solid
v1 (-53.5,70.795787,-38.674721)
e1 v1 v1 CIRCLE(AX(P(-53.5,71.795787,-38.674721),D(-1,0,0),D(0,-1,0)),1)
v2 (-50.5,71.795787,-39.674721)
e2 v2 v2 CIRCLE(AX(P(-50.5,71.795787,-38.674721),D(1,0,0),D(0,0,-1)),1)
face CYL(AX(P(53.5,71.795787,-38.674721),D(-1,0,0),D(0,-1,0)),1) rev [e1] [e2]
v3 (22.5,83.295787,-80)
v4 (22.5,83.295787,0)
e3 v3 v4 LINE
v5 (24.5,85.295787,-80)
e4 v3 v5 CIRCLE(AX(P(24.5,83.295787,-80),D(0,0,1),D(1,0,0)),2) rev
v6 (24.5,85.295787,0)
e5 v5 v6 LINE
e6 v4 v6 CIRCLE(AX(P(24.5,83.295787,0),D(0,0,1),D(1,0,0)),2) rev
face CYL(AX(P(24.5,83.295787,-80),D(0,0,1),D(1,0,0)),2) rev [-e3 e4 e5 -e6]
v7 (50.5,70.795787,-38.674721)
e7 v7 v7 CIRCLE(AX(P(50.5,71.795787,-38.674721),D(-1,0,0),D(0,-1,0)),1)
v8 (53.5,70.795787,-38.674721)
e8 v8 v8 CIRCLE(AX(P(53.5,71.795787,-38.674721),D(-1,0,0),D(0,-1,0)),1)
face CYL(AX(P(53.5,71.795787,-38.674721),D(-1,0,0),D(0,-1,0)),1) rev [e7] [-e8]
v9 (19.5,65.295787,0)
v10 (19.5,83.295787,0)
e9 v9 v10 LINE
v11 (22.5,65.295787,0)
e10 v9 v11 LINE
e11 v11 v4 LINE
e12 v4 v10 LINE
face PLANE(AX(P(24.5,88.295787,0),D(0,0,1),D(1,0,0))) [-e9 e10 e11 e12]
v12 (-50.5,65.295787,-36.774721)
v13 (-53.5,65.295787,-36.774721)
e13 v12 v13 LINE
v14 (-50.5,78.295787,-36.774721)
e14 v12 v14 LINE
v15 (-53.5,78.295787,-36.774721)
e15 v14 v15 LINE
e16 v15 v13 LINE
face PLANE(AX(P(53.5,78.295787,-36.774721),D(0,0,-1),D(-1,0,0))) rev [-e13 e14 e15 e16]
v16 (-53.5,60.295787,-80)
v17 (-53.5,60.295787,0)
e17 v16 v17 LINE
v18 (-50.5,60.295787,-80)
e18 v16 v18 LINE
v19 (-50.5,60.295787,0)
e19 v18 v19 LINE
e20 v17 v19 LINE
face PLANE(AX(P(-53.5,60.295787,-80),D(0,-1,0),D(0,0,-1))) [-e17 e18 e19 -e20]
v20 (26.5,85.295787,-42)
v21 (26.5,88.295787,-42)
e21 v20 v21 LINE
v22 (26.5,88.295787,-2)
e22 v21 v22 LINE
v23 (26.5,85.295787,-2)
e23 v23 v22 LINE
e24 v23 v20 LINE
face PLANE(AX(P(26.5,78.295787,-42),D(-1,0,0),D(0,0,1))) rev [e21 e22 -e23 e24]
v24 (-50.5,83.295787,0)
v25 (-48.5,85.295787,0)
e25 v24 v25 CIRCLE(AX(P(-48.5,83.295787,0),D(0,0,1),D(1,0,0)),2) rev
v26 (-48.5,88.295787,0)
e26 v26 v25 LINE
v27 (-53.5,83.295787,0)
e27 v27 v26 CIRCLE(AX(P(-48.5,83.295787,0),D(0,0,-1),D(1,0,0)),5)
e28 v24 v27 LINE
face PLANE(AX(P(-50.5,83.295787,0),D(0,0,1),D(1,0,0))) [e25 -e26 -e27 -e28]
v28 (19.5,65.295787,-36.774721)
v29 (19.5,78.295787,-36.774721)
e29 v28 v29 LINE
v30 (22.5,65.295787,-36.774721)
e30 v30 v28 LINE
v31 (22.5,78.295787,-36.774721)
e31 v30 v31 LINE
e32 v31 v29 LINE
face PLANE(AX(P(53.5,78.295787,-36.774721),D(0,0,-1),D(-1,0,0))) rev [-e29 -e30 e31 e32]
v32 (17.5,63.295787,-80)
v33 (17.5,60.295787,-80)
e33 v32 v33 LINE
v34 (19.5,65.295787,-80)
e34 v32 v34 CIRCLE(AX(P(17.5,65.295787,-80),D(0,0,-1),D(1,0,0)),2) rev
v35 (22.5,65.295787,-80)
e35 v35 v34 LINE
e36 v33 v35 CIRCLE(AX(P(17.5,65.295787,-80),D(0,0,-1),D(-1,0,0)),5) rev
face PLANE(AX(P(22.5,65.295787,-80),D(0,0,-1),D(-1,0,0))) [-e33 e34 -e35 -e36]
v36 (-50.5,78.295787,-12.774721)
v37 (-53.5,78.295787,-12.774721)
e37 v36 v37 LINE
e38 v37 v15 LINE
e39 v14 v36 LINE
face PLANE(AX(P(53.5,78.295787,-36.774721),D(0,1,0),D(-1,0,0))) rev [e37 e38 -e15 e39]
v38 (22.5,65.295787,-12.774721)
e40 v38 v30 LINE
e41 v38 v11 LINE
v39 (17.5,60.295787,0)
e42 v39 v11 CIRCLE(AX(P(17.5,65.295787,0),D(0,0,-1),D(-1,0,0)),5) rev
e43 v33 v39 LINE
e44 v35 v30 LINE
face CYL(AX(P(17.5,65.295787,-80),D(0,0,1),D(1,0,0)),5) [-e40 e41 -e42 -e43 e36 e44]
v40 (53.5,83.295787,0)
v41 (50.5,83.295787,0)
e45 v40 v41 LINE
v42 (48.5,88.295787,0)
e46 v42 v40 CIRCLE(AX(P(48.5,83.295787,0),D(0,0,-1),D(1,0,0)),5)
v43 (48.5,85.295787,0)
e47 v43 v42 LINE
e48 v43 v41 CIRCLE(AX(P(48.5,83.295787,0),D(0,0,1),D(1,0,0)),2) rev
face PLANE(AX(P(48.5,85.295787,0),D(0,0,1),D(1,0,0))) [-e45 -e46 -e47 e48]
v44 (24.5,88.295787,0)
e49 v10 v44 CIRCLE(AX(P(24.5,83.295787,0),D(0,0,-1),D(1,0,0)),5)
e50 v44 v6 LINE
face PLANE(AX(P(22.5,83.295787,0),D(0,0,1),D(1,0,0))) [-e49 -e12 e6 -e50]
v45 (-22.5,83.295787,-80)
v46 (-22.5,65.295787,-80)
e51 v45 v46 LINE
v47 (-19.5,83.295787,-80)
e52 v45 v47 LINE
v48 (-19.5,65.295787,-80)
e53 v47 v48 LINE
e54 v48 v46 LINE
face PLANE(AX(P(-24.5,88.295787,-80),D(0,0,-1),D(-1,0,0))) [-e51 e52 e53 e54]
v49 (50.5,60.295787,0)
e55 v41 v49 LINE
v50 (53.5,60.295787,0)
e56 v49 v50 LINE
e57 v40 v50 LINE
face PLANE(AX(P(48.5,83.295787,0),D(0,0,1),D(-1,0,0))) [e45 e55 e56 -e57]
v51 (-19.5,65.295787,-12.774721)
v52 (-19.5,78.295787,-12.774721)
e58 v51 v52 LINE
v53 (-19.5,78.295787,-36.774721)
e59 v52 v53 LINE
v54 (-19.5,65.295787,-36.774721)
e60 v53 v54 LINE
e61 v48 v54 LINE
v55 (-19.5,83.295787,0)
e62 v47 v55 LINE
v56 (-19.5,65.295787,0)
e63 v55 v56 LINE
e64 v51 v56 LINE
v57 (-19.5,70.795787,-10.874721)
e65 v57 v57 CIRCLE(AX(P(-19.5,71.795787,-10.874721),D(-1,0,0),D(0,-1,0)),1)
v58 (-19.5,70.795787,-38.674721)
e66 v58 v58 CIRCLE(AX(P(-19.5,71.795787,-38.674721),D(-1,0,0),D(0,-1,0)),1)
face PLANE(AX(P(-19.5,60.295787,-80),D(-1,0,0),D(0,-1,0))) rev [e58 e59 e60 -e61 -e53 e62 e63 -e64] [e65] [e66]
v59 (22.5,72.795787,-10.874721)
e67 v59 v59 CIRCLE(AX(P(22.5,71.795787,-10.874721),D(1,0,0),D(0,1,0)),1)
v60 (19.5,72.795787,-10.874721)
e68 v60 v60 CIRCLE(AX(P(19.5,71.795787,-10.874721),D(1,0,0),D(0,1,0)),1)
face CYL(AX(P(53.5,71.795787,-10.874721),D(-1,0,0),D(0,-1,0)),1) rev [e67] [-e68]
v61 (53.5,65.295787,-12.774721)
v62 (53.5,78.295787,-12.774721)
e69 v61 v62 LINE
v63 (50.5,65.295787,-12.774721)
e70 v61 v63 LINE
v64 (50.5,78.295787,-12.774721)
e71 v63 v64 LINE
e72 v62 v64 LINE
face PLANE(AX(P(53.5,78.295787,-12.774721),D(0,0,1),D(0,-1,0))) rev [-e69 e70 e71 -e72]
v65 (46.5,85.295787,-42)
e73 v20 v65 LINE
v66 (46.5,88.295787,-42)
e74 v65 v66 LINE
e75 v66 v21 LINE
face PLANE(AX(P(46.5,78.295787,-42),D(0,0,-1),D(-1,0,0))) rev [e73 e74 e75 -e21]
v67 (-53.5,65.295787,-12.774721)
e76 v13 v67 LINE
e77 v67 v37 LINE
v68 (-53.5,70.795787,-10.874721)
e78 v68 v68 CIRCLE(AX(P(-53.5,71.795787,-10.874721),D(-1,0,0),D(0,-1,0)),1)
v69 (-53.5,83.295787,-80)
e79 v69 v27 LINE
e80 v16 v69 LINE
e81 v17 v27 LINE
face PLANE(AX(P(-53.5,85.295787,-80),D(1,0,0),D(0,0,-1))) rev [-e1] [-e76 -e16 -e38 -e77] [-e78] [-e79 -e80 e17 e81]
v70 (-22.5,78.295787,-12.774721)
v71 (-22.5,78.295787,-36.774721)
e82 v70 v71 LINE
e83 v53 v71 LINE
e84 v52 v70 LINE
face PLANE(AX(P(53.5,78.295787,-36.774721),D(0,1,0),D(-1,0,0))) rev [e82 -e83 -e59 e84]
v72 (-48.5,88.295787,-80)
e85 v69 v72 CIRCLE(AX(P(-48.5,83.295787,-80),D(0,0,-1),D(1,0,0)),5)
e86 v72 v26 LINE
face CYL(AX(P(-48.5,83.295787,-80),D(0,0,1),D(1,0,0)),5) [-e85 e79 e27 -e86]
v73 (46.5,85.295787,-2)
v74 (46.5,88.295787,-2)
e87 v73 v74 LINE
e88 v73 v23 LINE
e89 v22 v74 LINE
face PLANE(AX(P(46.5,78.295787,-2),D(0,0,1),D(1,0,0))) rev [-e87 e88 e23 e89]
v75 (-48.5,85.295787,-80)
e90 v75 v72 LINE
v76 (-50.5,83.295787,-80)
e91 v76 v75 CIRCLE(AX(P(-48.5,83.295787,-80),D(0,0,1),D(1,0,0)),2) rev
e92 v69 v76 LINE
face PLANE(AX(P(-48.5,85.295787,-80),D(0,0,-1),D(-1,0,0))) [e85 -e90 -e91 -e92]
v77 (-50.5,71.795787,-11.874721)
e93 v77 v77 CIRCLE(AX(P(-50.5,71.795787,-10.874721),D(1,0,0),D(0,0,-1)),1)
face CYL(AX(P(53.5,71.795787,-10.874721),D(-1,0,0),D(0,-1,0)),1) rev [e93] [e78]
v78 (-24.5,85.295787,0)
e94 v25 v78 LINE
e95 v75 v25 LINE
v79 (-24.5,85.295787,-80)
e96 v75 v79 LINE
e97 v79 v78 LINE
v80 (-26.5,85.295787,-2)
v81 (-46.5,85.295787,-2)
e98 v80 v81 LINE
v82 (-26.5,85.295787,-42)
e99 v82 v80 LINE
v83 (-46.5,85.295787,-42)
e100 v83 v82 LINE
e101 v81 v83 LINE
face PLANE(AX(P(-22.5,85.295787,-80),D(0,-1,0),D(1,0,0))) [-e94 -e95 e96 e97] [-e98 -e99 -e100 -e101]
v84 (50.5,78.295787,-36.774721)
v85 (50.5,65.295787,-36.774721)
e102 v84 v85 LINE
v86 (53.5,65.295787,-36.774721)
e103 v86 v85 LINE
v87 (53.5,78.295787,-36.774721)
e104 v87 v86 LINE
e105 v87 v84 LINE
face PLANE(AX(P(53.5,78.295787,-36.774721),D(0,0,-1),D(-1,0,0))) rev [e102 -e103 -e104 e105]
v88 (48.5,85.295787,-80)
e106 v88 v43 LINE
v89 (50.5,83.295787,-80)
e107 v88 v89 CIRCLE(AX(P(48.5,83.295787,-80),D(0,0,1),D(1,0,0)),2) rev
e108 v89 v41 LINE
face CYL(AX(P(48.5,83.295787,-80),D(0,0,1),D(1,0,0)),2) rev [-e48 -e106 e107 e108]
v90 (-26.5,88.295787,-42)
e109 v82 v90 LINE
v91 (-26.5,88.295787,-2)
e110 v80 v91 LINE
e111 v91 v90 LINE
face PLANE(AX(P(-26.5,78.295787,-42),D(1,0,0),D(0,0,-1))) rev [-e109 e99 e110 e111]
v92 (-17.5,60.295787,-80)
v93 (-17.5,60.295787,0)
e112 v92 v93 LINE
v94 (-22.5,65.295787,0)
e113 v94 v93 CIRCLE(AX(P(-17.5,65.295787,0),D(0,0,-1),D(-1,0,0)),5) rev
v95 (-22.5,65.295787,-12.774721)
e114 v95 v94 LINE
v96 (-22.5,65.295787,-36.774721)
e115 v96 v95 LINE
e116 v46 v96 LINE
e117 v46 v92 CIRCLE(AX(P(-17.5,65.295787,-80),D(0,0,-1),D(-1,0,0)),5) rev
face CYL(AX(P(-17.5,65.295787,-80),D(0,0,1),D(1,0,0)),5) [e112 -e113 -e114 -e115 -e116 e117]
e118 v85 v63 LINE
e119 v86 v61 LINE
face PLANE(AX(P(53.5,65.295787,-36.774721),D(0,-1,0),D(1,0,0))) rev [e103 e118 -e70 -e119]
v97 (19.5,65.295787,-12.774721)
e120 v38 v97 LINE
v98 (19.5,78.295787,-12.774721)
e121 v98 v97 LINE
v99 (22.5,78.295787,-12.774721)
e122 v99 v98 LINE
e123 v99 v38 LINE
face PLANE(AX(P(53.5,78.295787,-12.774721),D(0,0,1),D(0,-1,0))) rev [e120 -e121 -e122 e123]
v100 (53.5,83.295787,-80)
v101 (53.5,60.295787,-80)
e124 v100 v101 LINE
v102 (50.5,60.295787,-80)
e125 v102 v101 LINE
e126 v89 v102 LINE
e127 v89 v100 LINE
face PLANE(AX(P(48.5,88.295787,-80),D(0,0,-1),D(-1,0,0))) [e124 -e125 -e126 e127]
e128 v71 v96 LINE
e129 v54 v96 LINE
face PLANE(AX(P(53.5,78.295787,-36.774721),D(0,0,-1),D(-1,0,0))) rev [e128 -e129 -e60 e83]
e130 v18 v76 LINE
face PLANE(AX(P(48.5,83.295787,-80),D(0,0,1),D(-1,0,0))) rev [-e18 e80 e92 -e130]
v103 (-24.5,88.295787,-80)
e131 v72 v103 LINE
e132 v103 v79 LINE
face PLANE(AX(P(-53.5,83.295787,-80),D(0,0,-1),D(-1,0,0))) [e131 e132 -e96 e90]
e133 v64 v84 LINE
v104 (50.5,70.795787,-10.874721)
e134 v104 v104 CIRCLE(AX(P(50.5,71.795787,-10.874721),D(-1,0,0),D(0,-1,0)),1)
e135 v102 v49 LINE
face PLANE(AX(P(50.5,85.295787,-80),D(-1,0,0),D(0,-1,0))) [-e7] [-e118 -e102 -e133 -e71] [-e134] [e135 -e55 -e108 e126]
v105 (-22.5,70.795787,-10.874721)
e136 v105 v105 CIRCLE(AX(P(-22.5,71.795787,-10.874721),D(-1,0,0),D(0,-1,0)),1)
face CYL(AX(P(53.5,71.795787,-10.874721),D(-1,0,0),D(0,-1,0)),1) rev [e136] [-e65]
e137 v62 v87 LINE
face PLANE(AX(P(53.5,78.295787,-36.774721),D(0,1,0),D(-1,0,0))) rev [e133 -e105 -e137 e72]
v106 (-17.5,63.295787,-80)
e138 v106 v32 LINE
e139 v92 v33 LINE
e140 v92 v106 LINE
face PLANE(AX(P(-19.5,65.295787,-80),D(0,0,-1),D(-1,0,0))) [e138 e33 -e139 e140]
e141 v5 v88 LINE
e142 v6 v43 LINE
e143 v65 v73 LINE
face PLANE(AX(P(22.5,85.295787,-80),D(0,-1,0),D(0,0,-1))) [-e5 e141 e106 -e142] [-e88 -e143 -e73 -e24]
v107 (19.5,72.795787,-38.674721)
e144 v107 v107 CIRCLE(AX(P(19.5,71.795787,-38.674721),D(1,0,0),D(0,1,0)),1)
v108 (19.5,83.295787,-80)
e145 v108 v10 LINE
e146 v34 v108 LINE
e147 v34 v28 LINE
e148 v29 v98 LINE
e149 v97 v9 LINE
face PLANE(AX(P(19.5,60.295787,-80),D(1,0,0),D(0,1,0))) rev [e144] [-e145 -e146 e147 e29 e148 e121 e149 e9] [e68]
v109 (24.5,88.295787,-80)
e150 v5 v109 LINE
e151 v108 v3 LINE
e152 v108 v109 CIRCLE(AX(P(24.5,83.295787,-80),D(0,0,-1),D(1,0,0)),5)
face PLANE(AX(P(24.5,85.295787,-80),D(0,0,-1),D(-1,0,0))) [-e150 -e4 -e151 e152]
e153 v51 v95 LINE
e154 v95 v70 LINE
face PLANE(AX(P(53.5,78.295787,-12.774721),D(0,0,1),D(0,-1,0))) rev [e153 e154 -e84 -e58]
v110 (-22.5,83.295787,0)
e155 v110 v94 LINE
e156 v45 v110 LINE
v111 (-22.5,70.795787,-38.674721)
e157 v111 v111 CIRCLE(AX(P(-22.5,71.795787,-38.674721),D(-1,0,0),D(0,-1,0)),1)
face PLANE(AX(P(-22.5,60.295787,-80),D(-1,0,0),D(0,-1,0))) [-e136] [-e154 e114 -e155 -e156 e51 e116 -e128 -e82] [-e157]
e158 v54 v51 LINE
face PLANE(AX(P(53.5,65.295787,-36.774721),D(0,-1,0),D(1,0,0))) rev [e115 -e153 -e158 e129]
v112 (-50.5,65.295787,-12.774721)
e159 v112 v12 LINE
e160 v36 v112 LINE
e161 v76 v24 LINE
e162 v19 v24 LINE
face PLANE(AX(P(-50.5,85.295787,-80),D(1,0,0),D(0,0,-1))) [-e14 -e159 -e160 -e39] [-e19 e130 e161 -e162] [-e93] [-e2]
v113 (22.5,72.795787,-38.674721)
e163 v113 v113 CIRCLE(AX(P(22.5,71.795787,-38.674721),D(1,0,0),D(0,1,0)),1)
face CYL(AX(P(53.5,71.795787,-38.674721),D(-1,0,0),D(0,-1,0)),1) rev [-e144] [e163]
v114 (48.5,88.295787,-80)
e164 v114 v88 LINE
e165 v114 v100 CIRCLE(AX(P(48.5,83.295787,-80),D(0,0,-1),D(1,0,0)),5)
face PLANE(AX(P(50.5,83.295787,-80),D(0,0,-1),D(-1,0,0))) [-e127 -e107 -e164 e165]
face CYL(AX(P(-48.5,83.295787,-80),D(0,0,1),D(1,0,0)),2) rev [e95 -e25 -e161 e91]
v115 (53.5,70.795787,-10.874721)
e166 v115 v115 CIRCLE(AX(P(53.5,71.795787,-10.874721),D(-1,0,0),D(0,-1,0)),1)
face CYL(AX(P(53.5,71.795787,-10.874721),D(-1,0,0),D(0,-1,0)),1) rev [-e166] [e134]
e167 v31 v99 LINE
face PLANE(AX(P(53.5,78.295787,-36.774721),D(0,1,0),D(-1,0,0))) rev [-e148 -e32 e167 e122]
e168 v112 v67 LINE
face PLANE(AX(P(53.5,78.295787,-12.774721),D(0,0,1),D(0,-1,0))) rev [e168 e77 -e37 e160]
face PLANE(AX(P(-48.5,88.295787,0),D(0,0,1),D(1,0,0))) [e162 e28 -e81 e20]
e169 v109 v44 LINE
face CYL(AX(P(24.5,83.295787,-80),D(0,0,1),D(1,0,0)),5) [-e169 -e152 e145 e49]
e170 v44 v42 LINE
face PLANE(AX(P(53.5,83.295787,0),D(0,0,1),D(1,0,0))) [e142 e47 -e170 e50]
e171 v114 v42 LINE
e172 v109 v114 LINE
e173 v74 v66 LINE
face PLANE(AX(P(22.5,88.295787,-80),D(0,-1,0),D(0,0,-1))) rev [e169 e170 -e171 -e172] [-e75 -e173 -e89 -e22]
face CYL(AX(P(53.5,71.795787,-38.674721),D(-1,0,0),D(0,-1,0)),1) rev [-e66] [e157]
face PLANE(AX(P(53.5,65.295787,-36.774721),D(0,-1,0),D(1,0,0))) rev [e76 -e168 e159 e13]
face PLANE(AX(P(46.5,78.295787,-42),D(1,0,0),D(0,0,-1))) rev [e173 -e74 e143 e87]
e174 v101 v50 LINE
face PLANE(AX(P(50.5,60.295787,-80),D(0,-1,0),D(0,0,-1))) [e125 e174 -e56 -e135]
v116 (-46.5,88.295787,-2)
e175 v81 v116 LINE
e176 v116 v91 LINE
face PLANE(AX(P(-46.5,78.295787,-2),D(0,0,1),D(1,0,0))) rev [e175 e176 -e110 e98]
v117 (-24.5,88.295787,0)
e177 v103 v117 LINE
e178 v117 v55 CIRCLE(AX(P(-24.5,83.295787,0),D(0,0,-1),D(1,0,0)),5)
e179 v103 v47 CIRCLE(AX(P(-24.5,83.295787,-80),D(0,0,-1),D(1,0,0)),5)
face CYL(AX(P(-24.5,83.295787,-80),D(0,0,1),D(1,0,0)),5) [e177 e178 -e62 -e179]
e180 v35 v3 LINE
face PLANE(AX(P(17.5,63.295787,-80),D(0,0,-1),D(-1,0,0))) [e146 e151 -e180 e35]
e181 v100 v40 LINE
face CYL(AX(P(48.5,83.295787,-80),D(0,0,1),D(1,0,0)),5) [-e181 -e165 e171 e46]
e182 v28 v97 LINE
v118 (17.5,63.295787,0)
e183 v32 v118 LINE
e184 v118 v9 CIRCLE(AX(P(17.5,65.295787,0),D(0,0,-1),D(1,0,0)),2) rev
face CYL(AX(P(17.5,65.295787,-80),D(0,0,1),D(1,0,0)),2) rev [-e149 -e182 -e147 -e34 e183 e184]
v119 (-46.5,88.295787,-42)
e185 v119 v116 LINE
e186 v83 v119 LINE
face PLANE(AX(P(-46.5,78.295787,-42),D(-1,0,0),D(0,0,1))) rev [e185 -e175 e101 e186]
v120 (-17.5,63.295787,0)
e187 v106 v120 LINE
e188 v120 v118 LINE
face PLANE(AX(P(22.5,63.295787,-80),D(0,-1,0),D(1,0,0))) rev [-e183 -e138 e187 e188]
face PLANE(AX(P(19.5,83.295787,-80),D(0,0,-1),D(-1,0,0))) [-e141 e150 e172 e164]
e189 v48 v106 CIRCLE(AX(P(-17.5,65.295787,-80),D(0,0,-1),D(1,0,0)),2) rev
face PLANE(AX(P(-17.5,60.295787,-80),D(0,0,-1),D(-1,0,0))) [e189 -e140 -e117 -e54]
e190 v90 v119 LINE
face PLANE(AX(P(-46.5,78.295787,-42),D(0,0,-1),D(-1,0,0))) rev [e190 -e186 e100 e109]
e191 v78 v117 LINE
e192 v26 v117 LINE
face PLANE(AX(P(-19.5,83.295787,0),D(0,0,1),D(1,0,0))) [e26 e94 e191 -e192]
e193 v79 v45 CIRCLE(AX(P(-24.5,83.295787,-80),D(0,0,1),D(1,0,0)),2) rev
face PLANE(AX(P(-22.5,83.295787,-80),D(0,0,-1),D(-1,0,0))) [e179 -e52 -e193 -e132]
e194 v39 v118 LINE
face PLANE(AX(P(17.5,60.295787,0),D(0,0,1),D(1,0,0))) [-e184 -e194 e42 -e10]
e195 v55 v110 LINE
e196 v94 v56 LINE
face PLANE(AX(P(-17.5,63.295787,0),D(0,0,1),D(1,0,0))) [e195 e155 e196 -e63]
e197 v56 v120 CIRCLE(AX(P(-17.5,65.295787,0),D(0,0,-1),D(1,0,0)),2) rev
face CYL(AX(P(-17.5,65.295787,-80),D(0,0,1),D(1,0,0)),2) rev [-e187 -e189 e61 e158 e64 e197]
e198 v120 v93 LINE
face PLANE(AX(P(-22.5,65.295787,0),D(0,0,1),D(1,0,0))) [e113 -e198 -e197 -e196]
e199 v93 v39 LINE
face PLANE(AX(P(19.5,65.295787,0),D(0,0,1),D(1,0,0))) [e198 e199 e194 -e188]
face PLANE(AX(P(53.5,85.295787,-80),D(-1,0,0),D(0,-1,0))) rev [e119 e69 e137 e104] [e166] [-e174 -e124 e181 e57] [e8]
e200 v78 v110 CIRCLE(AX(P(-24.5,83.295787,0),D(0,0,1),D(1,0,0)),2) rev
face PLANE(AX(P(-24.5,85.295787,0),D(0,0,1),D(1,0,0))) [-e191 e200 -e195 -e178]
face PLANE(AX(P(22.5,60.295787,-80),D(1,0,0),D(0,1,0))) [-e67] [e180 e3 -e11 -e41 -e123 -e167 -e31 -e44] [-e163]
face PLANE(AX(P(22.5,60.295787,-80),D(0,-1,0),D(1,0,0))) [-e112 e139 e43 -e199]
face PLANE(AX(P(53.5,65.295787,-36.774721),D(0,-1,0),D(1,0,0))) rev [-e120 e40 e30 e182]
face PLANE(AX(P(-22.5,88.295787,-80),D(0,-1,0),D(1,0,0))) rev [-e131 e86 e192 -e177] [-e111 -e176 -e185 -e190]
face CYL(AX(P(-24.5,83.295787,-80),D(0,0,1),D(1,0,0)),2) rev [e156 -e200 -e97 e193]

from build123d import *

# Parameters (mm, degrees)
BASE_FLANGE1_DEPTH = 80
SKETCH6_R          = 1
SKETCH6_W          = 24
SKETCH6_H          = 13
CUT_EXTRUDE1_DEPTH = 161.141019336
SKETCH7_W          = 20
SKETCH7_H          = 40
CUT_EXTRUDE2_DEPTH = 10


# Sheet-metal steps are written as plain solids
with BuildPart() as part:
    # Sketch1 → Base-Flange1 (new body)
    with BuildSketch(Plane(origin=(0, 0, 0), x_dir=(1, 0, 0), z_dir=(0, 0, -1))):
        with BuildLine():
            Line((50.5, -60.295787408), (50.5, -83.295787408))
            ThreePointArc((50.5, -83.295787408), (49.914213562, -84.710000971), (48.5, -85.295787408))
            Line((48.5, -85.295787408), (24.5, -85.295787408))
            ThreePointArc((24.5, -85.295787408), (23.085786438, -84.710000971), (22.5, -83.295787408))
            Line((22.5, -83.295787408), (22.5, -65.295787408))
            ThreePointArc((22.5, -65.295787408), (21.035533906, -61.760253502), (17.5, -60.295787408))
            Line((17.5, -60.295787408), (-17.5, -60.295787408))
            ThreePointArc((-17.5, -60.295787408), (-21.035533906, -61.760253502), (-22.5, -65.295787408))
            Line((-22.5, -65.295787408), (-22.5, -83.295787408))
            ThreePointArc((-22.5, -83.295787408), (-23.085786438, -84.710000971), (-24.5, -85.295787408))
            Line((-24.5, -85.295787408), (-48.5, -85.295787408))
            ThreePointArc((-48.5, -85.295787408), (-49.914213562, -84.710000971), (-50.5, -83.295787408))
            Line((-50.5, -83.295787408), (-50.5, -60.295787408))
            Line((-50.5, -60.295787408), (-53.5, -60.295787408))
            Line((-53.5, -60.295787408), (-53.5, -83.295787408))
            ThreePointArc((-53.5, -83.295787408), (-52.035533906, -86.831321314), (-48.5, -88.295787408))
            Line((-48.5, -88.295787408), (-24.5, -88.295787408))
            ThreePointArc((-24.5, -88.295787408), (-20.964466094, -86.831321314), (-19.5, -83.295787408))
            Line((-19.5, -83.295787408), (-19.5, -65.295787408))
            ThreePointArc((-19.5, -65.295787408), (-18.914213562, -63.881573846), (-17.5, -63.295787408))
            Line((-17.5, -63.295787408), (17.5, -63.295787408))
            ThreePointArc((17.5, -63.295787408), (18.914213562, -63.881573846), (19.5, -65.295787408))
            Line((19.5, -65.295787408), (19.5, -83.295787408))
            ThreePointArc((19.5, -83.295787408), (20.964466094, -86.831321314), (24.5, -88.295787408))
            Line((24.5, -88.295787408), (48.5, -88.295787408))
            ThreePointArc((48.5, -88.295787408), (52.035533906, -86.831321314), (53.5, -83.295787408))
            Line((53.5, -83.295787408), (53.5, -60.295787408))
            Line((53.5, -60.295787408), (50.5, -60.295787408))
        make_face()
    extrude(amount=BASE_FLANGE1_DEPTH)

    # Sketch6 → Cut-Extrude1 (cut, through all)
    with BuildSketch(Plane.ZY.offset(53.5)):
        with Locations(Location((-38.674720748, 71.795787408, 0), (0, 0, 90))):
            Circle(SKETCH6_R)
        with Locations(Location((-10.874720748, 71.795787408, 0), (0, 0, 90))):
            Circle(SKETCH6_R)
        with Locations((-24.774720748, 71.795787408)):
            Rectangle(SKETCH6_W, SKETCH6_H)
    extrude(amount=-CUT_EXTRUDE1_DEPTH, mode=Mode.SUBTRACT)

    # Sketch7 → Cut-Extrude2 (cut)
    with BuildSketch(Plane(origin=(0, 88.295787408, 0), x_dir=(1, 0, 0), z_dir=(0, 1, 0))):
        with Locations((-36.5, 22)):
            Rectangle(SKETCH7_W, SKETCH7_H)
        with Locations((36.5, 22)):
            Rectangle(SKETCH7_W, SKETCH7_H)
    extrude(amount=-CUT_EXTRUDE2_DEPTH, mode=Mode.SUBTRACT)


solid = part.part
